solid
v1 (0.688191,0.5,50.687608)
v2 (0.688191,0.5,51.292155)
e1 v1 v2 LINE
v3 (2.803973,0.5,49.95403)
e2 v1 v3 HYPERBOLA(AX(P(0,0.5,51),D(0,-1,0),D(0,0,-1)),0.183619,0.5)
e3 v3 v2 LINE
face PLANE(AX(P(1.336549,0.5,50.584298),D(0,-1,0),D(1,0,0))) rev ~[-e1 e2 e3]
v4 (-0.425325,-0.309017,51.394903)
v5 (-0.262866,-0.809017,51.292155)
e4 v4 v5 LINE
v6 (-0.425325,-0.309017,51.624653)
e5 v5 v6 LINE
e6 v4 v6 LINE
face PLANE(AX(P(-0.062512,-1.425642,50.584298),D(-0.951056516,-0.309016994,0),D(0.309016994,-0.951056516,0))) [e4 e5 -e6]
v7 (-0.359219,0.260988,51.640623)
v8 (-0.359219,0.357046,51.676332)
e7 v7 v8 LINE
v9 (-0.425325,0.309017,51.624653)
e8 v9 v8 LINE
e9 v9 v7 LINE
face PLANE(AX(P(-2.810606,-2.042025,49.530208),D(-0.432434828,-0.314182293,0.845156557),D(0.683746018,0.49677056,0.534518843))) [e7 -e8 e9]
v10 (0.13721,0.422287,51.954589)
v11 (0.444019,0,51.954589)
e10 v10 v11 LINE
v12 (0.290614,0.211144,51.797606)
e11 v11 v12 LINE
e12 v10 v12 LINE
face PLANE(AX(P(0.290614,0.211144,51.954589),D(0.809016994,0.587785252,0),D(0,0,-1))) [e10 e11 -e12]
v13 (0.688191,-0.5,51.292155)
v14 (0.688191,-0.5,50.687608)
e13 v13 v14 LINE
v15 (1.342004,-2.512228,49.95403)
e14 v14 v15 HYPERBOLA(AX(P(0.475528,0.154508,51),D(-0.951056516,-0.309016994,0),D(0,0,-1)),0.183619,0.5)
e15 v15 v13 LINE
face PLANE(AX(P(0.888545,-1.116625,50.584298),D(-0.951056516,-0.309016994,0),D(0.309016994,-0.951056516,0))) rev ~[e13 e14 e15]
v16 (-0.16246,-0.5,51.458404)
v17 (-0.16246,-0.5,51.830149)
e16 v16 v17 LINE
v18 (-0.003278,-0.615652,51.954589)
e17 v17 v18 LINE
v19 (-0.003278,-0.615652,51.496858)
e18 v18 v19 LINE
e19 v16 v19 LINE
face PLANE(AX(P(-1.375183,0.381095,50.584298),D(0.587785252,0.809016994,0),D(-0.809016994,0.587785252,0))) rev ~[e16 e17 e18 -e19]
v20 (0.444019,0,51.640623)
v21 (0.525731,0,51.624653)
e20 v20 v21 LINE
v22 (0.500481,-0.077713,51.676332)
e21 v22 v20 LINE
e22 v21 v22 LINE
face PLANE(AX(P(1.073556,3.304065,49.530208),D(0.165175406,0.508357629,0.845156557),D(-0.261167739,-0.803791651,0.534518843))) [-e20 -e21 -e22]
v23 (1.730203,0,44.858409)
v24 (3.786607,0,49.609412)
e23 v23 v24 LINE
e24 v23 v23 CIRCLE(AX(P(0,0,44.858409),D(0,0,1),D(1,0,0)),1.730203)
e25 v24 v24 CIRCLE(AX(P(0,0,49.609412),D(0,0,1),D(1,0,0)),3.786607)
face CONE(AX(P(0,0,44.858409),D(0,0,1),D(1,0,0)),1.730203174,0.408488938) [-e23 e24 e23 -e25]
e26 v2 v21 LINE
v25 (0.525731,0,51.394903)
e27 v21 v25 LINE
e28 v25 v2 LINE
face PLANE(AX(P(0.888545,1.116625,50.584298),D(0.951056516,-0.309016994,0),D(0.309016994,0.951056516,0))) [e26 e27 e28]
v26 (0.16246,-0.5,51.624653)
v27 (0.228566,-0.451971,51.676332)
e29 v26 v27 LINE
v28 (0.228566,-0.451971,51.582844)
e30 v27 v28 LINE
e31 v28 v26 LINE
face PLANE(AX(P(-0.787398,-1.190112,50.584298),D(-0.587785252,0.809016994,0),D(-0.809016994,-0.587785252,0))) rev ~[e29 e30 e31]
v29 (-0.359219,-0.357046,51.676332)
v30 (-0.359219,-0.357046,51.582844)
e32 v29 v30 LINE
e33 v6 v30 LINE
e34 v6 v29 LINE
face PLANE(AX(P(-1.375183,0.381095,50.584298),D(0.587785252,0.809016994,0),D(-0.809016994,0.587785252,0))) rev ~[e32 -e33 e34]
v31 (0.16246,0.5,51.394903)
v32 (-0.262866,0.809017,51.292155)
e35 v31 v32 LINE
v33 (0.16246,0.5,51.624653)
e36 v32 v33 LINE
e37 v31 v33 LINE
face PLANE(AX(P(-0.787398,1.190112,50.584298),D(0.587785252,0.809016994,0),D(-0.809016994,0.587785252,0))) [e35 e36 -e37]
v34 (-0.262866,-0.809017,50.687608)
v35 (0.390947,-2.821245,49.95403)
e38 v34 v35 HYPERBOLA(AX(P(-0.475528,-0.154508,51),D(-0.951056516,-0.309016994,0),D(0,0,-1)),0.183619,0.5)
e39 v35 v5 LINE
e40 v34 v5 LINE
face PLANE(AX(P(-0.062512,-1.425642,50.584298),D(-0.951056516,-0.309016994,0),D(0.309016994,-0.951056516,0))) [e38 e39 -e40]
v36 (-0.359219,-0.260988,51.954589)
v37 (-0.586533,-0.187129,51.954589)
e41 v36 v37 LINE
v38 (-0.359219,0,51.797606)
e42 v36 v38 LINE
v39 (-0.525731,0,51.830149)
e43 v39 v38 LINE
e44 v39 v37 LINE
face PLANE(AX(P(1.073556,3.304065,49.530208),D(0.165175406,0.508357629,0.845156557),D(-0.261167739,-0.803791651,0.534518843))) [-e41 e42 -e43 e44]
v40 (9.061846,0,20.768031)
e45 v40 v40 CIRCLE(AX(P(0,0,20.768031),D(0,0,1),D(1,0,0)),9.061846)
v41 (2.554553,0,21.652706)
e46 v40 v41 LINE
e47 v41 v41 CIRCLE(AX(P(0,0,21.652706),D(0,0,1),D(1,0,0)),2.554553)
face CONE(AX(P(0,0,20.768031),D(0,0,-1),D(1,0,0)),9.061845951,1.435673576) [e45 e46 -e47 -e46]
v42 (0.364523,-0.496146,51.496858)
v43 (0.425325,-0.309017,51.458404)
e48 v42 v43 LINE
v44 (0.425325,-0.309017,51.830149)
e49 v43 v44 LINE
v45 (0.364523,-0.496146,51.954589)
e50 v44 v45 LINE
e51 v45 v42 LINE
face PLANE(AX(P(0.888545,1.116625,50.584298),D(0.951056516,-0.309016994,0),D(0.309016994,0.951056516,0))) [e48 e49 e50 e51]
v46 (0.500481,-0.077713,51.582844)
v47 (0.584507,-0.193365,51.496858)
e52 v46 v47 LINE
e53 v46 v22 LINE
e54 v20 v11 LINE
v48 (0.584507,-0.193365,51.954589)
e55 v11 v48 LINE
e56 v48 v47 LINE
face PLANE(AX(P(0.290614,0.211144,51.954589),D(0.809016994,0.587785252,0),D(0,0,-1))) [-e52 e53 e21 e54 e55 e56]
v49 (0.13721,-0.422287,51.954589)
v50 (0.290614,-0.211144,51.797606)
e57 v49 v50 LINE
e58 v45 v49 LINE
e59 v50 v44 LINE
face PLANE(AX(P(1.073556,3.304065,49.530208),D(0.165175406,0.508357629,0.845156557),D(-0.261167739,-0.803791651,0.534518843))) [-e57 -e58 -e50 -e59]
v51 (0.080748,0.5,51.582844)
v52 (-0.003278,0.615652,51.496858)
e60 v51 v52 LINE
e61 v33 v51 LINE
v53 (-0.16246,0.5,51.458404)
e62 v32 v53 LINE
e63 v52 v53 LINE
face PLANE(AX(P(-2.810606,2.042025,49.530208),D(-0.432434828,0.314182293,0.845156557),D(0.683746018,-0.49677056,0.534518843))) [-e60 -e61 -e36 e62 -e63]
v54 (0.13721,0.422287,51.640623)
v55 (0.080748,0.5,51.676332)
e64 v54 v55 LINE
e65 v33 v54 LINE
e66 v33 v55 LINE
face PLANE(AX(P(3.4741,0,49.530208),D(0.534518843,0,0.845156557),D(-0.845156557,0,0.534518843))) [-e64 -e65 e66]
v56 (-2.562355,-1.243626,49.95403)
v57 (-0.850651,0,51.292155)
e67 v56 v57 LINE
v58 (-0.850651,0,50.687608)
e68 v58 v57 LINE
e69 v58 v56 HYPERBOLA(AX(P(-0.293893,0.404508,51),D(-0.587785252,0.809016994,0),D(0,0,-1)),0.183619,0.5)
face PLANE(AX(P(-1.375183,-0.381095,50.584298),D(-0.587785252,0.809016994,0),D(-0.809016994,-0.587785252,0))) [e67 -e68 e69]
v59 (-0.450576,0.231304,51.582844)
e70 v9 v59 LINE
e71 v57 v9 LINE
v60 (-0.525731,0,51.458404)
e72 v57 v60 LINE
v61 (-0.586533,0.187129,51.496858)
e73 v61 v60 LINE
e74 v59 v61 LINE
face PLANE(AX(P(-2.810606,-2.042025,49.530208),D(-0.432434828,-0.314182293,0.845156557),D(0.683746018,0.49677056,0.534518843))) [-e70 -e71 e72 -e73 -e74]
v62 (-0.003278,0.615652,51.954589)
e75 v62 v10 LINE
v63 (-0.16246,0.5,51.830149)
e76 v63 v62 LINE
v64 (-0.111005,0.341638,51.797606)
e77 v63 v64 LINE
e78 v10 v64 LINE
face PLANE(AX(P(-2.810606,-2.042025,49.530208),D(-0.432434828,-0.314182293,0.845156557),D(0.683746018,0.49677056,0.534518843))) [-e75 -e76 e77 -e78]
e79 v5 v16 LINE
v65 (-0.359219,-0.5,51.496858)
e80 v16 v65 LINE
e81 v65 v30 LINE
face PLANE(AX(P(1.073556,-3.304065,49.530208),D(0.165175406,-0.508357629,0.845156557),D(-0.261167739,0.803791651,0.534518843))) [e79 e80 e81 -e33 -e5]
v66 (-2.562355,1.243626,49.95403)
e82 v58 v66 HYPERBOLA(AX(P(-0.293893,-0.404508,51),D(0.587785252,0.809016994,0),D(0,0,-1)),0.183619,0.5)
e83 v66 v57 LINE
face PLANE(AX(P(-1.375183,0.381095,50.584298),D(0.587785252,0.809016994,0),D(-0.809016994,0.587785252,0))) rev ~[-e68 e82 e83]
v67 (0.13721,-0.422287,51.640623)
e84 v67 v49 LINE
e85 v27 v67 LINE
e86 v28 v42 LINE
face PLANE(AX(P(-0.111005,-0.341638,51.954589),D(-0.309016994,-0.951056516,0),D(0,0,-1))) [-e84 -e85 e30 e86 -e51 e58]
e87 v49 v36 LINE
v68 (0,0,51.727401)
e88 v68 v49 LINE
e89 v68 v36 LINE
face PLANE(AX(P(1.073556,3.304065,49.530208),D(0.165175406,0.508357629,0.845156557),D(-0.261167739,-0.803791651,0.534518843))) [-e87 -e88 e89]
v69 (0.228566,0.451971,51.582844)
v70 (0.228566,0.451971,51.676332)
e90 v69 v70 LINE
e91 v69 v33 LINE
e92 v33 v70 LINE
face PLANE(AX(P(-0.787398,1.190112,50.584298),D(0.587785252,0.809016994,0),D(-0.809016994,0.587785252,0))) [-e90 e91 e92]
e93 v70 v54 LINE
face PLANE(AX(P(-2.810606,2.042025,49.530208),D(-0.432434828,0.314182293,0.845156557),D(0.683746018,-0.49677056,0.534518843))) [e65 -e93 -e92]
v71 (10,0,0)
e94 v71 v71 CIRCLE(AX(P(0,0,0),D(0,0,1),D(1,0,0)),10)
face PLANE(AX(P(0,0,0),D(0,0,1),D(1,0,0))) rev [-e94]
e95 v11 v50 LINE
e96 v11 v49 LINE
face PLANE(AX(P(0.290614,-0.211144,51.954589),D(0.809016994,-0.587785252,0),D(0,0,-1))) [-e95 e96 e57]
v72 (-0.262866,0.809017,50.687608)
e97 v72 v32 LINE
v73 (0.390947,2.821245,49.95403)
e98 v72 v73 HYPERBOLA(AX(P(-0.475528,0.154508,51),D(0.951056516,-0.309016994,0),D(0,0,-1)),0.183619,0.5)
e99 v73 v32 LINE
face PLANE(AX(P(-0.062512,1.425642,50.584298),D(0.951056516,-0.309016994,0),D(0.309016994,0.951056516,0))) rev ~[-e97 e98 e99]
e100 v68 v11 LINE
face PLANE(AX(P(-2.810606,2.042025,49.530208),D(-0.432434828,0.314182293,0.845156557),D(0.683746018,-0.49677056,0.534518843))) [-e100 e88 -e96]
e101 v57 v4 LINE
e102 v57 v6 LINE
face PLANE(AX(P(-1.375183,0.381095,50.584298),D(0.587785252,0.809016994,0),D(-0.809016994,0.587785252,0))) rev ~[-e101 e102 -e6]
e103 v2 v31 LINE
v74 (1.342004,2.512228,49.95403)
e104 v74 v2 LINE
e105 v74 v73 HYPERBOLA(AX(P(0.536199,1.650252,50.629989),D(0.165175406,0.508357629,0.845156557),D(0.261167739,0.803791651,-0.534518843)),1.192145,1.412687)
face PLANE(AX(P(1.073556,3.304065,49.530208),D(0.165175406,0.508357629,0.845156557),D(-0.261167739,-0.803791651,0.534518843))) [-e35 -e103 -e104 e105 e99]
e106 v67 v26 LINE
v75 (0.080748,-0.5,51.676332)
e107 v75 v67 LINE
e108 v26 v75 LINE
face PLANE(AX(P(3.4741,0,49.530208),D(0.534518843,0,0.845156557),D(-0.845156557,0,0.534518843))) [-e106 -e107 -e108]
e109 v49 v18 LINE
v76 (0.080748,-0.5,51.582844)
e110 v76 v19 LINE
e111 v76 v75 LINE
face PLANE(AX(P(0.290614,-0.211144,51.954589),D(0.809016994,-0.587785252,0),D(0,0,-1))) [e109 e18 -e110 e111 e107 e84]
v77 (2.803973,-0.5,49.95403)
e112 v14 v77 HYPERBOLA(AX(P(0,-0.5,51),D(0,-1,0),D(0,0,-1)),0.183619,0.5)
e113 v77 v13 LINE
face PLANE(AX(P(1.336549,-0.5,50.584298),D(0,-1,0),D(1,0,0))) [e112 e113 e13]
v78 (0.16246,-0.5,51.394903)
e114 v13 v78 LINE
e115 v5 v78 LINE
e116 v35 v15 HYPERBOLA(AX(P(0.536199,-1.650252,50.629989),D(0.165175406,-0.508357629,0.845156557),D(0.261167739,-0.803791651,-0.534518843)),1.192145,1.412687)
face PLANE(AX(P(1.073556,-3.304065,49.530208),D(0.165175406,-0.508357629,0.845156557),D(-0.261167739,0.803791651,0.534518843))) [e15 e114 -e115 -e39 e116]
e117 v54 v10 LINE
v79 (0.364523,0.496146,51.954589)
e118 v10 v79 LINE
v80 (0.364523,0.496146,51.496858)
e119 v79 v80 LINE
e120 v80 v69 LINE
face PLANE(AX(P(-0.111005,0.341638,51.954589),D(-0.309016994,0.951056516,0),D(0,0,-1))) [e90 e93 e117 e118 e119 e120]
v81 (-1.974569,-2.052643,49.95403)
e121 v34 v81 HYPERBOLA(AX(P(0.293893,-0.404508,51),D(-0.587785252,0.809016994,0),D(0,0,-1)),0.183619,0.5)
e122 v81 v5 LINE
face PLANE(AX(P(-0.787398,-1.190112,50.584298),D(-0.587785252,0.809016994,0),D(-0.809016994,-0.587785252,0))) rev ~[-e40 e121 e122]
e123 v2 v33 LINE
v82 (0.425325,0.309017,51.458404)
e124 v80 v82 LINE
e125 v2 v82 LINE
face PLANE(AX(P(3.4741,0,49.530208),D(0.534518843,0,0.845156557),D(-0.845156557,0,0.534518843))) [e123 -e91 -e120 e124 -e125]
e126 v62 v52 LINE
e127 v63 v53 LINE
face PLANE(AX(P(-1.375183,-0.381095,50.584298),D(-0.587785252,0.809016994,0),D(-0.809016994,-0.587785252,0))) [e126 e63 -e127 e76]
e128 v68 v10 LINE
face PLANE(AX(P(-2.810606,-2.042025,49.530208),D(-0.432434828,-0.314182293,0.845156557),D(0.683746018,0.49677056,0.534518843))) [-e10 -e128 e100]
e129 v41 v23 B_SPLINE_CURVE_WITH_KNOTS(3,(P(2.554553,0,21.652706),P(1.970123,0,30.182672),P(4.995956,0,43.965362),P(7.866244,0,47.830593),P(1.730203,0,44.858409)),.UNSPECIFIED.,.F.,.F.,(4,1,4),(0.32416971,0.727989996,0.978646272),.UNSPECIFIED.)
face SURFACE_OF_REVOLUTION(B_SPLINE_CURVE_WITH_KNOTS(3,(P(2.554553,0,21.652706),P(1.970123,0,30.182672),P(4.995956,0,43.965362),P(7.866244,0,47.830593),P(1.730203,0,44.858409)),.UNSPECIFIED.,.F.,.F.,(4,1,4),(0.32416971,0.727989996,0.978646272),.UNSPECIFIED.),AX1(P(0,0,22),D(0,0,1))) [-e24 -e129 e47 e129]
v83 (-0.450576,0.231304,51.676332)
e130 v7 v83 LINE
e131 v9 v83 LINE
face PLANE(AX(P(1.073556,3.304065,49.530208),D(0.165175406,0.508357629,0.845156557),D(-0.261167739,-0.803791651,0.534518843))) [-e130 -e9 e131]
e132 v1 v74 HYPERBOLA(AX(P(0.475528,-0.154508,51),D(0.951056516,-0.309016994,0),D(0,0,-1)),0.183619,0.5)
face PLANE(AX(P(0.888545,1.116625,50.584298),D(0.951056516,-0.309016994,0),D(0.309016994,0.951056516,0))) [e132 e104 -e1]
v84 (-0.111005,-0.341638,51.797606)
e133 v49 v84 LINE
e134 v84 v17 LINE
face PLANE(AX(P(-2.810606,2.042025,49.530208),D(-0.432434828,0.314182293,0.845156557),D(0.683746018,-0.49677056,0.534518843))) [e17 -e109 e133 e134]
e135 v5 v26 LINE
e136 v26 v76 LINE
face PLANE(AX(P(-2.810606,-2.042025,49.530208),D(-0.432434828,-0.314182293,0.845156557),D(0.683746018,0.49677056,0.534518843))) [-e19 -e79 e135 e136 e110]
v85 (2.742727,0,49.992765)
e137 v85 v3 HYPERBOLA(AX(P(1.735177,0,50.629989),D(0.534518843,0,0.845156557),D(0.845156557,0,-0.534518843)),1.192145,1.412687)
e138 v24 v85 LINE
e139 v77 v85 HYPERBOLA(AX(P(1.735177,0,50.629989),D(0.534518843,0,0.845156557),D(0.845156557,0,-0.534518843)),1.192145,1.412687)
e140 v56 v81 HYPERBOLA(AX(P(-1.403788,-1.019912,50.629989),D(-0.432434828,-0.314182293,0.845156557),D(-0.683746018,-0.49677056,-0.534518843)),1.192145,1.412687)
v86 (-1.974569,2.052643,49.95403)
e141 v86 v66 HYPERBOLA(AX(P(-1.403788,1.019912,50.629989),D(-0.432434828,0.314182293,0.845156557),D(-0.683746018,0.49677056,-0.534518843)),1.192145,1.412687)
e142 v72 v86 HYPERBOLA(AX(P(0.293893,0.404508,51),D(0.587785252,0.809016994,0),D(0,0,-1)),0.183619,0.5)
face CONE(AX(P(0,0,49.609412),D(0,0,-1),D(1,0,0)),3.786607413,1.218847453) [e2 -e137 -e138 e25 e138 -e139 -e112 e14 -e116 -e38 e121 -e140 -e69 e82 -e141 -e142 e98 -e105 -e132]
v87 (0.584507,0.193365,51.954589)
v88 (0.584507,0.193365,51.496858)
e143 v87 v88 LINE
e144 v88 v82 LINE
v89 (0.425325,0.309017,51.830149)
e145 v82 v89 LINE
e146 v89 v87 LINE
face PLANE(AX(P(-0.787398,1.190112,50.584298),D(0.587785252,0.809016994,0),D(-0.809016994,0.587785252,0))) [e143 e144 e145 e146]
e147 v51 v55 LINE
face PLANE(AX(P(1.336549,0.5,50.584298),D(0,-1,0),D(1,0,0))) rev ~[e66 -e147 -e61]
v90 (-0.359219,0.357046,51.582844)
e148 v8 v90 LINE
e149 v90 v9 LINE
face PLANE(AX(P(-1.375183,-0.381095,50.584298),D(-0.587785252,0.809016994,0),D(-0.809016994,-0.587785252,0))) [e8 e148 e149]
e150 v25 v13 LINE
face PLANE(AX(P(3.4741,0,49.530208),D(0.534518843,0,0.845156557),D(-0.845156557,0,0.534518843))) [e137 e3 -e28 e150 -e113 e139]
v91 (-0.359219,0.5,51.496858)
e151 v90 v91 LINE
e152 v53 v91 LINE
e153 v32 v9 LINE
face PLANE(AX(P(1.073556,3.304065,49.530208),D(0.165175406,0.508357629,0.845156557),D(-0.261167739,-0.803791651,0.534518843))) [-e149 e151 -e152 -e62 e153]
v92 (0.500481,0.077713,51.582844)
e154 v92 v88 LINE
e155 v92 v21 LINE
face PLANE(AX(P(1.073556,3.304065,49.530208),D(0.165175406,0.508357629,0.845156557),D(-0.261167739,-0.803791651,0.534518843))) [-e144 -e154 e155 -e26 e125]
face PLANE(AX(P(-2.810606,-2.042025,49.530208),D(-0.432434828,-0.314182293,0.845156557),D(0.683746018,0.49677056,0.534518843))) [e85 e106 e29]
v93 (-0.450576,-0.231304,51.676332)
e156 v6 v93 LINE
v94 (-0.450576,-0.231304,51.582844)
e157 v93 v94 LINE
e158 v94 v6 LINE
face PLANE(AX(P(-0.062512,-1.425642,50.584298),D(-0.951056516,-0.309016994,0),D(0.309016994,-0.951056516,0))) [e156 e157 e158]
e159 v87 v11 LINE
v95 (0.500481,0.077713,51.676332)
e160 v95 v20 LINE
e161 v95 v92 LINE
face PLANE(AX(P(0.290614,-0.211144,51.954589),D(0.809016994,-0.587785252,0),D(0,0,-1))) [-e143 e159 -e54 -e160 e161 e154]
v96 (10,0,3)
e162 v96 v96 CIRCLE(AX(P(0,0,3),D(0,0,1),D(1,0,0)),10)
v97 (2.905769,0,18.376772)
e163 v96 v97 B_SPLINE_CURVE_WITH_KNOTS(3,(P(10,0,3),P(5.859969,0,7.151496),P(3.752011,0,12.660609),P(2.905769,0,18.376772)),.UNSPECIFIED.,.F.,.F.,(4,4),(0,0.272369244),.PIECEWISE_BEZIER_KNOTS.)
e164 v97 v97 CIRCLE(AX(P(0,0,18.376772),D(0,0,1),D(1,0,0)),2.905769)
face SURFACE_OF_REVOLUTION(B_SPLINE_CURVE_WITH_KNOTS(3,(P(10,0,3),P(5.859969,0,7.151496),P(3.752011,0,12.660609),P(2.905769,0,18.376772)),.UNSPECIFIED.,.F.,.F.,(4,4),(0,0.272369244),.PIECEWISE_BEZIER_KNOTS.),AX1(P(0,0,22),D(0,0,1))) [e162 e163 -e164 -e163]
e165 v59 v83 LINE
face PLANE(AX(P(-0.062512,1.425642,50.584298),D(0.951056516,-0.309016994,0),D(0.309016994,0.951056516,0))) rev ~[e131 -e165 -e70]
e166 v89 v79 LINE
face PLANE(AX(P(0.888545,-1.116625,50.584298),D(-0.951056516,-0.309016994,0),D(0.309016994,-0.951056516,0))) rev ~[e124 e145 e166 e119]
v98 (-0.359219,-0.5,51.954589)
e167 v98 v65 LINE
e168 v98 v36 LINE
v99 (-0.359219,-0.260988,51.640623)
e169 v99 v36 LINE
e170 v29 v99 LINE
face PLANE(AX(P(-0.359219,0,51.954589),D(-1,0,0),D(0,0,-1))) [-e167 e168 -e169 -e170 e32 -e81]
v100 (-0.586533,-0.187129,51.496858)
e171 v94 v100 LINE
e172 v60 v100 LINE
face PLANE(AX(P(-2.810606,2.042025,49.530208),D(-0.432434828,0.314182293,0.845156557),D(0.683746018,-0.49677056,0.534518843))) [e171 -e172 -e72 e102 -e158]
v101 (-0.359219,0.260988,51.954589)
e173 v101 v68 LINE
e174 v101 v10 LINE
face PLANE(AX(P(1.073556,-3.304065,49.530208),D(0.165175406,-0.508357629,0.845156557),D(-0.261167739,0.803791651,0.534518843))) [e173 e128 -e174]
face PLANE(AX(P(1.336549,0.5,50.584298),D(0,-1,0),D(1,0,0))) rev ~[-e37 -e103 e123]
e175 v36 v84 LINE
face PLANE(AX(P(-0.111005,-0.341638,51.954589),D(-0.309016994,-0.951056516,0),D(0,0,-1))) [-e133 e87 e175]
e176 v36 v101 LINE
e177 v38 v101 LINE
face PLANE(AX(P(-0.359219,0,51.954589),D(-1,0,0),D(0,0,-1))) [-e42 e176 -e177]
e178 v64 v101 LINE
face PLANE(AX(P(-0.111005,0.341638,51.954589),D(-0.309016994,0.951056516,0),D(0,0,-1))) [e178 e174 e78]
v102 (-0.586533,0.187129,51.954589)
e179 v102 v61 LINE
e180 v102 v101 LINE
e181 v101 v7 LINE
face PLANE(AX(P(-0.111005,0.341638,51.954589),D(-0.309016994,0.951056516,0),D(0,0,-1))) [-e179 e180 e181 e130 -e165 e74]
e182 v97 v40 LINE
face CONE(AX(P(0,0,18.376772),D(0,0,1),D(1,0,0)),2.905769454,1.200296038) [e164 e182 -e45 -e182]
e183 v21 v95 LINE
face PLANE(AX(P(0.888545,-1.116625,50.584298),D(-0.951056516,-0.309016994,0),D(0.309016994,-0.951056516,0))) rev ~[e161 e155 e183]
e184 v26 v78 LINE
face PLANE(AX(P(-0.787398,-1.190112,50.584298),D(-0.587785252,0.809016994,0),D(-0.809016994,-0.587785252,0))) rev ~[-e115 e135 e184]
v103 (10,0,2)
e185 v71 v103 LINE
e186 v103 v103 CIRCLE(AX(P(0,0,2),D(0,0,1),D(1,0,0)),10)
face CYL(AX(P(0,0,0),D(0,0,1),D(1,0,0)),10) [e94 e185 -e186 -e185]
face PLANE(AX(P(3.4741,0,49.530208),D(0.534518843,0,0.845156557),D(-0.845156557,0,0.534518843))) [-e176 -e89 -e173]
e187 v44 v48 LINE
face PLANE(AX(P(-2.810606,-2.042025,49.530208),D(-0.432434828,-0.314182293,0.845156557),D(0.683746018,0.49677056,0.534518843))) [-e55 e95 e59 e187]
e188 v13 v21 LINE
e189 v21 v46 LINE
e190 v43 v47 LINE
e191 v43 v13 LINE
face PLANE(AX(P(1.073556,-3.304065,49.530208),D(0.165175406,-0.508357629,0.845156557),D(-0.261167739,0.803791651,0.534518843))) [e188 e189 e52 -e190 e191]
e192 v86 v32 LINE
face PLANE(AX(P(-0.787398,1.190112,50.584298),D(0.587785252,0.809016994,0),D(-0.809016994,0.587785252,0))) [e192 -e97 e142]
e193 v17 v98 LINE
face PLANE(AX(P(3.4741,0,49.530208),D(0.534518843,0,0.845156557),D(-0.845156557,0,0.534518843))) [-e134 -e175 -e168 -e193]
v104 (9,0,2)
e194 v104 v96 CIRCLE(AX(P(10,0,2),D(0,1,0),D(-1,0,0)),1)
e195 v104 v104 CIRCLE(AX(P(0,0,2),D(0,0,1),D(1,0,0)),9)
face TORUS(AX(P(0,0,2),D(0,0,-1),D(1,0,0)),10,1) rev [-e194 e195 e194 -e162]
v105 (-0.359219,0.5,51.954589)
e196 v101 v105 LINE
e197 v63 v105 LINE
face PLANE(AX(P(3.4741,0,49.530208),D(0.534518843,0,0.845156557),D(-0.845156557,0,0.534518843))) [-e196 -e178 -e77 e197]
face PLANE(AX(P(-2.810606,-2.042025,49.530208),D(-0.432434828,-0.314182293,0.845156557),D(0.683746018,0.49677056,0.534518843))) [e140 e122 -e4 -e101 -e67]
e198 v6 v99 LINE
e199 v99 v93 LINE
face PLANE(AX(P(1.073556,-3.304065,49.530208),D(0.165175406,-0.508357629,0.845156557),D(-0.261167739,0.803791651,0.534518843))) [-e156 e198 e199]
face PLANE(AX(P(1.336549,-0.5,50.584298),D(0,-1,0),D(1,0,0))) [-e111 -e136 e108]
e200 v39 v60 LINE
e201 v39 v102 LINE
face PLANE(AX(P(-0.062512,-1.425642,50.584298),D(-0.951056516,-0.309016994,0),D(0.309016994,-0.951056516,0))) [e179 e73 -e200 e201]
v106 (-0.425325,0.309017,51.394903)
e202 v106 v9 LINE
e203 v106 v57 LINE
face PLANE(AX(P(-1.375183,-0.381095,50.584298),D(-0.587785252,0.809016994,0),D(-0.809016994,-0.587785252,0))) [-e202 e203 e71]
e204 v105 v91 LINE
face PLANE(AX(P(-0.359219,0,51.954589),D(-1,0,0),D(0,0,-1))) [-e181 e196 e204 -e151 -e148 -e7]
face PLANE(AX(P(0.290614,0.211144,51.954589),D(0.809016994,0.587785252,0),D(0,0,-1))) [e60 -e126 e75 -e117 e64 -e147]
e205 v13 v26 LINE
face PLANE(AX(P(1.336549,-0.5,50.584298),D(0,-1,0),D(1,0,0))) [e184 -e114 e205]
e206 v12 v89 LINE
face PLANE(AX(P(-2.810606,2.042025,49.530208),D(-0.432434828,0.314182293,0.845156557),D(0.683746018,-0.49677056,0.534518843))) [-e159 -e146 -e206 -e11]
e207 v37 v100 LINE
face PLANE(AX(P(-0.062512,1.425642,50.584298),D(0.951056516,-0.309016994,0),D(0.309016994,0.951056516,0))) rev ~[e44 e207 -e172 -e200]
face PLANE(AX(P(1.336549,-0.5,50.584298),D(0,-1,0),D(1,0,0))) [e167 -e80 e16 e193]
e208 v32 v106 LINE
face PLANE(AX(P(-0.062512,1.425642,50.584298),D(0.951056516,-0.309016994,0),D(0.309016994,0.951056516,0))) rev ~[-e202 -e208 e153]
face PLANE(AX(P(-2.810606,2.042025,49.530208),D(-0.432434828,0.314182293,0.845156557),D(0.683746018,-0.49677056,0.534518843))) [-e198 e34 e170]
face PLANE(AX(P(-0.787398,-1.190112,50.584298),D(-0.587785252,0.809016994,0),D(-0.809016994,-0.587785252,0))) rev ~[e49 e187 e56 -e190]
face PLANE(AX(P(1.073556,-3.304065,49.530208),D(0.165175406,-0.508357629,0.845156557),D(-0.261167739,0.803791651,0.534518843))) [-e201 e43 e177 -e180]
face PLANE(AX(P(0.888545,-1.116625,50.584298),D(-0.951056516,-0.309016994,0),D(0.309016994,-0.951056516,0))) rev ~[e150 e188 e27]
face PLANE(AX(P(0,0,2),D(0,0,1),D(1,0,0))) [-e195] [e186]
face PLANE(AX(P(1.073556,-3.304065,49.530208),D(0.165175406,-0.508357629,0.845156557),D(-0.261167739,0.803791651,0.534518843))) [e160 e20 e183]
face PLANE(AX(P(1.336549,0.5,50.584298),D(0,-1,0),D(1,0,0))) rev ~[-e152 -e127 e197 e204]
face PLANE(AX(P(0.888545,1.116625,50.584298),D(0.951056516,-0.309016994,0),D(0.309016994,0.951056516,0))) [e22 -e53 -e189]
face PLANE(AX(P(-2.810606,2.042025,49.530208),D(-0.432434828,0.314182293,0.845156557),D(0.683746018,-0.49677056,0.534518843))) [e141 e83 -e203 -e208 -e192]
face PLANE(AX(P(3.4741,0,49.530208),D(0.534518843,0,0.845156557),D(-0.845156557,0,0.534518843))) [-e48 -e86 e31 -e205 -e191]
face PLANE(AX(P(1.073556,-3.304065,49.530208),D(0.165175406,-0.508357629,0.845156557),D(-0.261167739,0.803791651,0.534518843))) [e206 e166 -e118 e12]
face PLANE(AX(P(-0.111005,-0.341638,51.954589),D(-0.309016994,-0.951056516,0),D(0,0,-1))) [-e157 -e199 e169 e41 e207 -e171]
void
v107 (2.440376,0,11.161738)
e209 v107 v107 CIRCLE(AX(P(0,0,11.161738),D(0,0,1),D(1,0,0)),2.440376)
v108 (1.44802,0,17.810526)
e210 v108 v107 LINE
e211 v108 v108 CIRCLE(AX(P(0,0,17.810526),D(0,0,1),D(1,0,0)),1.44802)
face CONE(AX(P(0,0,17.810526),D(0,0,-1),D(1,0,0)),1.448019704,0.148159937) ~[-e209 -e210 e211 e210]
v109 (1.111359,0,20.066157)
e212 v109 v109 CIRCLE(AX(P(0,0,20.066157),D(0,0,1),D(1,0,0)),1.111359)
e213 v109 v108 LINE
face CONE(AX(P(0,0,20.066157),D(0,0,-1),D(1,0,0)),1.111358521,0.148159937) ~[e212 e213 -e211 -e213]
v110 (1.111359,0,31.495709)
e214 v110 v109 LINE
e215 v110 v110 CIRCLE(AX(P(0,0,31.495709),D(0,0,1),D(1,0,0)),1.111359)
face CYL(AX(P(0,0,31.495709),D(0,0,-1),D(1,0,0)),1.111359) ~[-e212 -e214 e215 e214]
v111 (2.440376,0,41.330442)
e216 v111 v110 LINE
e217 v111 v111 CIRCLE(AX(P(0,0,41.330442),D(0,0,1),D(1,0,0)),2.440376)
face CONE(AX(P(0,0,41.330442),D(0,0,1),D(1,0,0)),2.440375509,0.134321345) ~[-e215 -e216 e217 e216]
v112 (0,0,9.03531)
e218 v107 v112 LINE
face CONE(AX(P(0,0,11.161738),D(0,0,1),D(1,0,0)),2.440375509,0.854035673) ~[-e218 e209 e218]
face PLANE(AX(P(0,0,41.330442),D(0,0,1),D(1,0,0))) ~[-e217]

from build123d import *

# Parameters (mm, degrees)
F3_DEPTH = 0.5
F4_COUNT = 5


# Not quite as in the source:
# - a feature names something its author has since deleted; it is built from what else it names


with BuildPart() as f1:
    # F0 (on Front) → F1 (revolve)
    with BuildSketch(Plane.XZ):
        with BuildLine():
            Line((0, 9.0353097767), (0, 0))
            Line((0, 0), (10, 0))
            Line((10, 0), (10, 2))
            Line((10, 2), (9, 2))
            ThreePointArc((9, 2), (9.2928932188, 2.7071067812), (10, 3))
            add(Edge.make_bspline(
                [(10, 3), (5.8599692942, 7.1514955665), (3.7520111059, 12.6606088045), (2.9057694535, 18.3767723616)],
                knots=[0, 0, 0, 0, 0.2723692437, 0.2723692437, 0.2723692437, 0.2723692437], degree=3))
            Line((2.9057694535, 18.3767723616), (1.4480197044, 17.810525763))
            Line((1.4480197044, 17.810525763), (2.4403755087, 11.1617380753))
            Line((2.4403755087, 11.1617380753), (0, 9.0353097767))
        make_face()
        with BuildLine():
            Line((0, 51), (0, 44))
            add(Edge.make_bspline(
                [(1.7302031744, 44.8584092014), (1.2074659957, 44.6052050311), (0.6322180551, 44.3196864642), (0, 44)],
                knots=[0.9786462718, 0.9786462718, 0.9786462718, 0.9786462718, 1, 1, 1, 1], degree=3))
            Line((1.7302031744, 44.8584092014), (3.7866074126, 49.6094115078))
            Line((3.7866074126, 49.6094115078), (0, 51))
        make_face()
        with BuildLine():
            Line((1.1113585206, 20.0661569834), (1.4480197044, 17.810525763))
            Line((1.4480197044, 17.810525763), (2.9057694535, 18.3767723616))
            add(Edge.make_bspline(
                [(2.9057694535, 18.3767723616), (2.7448272283, 19.4638992829), (2.6295215739, 20.5585152608), (2.554553193, 21.6527055151)],
                knots=[0.2723692437, 0.2723692437, 0.2723692437, 0.2723692437, 0.32416971, 0.32416971, 0.32416971, 0.32416971], degree=3))
            Line((2.554553193, 21.6527055151), (1.1113585206, 21.8489095134))
            Line((1.1113585206, 21.8489095134), (1.1113585206, 20.0661569834))
        make_face()
        with BuildLine():
            add(Edge.make_bspline(
                [(2.9057694535, 18.3767723616), (2.7448272283, 19.4638992829), (2.6295215739, 20.5585152608), (2.554553193, 21.6527055151)],
                knots=[0.2723692437, 0.2723692437, 0.2723692437, 0.2723692437, 0.32416971, 0.32416971, 0.32416971, 0.32416971], degree=3))
            Line((2.9057694535, 18.3767723616), (9.0618459508, 20.7680314779))
            Line((9.0618459508, 20.7680314779), (2.554553193, 21.6527055151))
        make_face()
        with BuildLine():
            Line((0, 44), (0, 41.3304418325))
            Line((0, 41.3304418325), (2.4403755087, 41.3304418325))
            Line((2.4403755087, 41.3304418325), (1.1113585206, 31.4957089722))
            Line((1.1113585206, 31.4957089722), (1.1113585206, 21.8489095134))
            Line((1.1113585206, 21.8489095134), (2.554553193, 21.6527055151))
            add(Edge.make_bspline(
                [(2.554553193, 21.6527055151), (1.9701230673, 30.1826716243), (4.9959561324, 43.9653621083), (7.8662442935, 47.8305934345), (1.7302031744, 44.8584092014)],
                knots=[0.32416971, 0.32416971, 0.32416971, 0.32416971, 0.727989996, 0.9786462718, 0.9786462718, 0.9786462718, 0.9786462718], degree=3))
            add(Edge.make_bspline(
                [(1.7302031744, 44.8584092014), (1.2074659957, 44.6052050311), (0.6322180551, 44.3196864642), (0, 44)],
                knots=[0.9786462718, 0.9786462718, 0.9786462718, 0.9786462718, 1, 1, 1, 1], degree=3))
        make_face()
    revolve(axis=Axis((0, 0, 22), (0, 0, 1)))



with BuildPart() as f3:
    # F2 (on Front) → F3 (new body, symmetric)
    with BuildSketch(Plane.XZ):
        Polygon((-0.3592191799, 51.9545889315), (-0.3592191799, 50.8362587973), (3.4741000272, 49.5302081108), align=None)
    extrude(amount=F3_DEPTH, both=True)


with BuildPart() as f1_1:
    add(f1.part)

    add(f3.part)  # F4 merges F3
    # F4: F3 ×5 about axis
    f4_axis = Axis((0, 0, 47.5), (0, 0, 1))
    for i in range(1, F4_COUNT):
        add(f3.part.rotate(f4_axis, i * 360 / F4_COUNT))


solid = f1_1.part
